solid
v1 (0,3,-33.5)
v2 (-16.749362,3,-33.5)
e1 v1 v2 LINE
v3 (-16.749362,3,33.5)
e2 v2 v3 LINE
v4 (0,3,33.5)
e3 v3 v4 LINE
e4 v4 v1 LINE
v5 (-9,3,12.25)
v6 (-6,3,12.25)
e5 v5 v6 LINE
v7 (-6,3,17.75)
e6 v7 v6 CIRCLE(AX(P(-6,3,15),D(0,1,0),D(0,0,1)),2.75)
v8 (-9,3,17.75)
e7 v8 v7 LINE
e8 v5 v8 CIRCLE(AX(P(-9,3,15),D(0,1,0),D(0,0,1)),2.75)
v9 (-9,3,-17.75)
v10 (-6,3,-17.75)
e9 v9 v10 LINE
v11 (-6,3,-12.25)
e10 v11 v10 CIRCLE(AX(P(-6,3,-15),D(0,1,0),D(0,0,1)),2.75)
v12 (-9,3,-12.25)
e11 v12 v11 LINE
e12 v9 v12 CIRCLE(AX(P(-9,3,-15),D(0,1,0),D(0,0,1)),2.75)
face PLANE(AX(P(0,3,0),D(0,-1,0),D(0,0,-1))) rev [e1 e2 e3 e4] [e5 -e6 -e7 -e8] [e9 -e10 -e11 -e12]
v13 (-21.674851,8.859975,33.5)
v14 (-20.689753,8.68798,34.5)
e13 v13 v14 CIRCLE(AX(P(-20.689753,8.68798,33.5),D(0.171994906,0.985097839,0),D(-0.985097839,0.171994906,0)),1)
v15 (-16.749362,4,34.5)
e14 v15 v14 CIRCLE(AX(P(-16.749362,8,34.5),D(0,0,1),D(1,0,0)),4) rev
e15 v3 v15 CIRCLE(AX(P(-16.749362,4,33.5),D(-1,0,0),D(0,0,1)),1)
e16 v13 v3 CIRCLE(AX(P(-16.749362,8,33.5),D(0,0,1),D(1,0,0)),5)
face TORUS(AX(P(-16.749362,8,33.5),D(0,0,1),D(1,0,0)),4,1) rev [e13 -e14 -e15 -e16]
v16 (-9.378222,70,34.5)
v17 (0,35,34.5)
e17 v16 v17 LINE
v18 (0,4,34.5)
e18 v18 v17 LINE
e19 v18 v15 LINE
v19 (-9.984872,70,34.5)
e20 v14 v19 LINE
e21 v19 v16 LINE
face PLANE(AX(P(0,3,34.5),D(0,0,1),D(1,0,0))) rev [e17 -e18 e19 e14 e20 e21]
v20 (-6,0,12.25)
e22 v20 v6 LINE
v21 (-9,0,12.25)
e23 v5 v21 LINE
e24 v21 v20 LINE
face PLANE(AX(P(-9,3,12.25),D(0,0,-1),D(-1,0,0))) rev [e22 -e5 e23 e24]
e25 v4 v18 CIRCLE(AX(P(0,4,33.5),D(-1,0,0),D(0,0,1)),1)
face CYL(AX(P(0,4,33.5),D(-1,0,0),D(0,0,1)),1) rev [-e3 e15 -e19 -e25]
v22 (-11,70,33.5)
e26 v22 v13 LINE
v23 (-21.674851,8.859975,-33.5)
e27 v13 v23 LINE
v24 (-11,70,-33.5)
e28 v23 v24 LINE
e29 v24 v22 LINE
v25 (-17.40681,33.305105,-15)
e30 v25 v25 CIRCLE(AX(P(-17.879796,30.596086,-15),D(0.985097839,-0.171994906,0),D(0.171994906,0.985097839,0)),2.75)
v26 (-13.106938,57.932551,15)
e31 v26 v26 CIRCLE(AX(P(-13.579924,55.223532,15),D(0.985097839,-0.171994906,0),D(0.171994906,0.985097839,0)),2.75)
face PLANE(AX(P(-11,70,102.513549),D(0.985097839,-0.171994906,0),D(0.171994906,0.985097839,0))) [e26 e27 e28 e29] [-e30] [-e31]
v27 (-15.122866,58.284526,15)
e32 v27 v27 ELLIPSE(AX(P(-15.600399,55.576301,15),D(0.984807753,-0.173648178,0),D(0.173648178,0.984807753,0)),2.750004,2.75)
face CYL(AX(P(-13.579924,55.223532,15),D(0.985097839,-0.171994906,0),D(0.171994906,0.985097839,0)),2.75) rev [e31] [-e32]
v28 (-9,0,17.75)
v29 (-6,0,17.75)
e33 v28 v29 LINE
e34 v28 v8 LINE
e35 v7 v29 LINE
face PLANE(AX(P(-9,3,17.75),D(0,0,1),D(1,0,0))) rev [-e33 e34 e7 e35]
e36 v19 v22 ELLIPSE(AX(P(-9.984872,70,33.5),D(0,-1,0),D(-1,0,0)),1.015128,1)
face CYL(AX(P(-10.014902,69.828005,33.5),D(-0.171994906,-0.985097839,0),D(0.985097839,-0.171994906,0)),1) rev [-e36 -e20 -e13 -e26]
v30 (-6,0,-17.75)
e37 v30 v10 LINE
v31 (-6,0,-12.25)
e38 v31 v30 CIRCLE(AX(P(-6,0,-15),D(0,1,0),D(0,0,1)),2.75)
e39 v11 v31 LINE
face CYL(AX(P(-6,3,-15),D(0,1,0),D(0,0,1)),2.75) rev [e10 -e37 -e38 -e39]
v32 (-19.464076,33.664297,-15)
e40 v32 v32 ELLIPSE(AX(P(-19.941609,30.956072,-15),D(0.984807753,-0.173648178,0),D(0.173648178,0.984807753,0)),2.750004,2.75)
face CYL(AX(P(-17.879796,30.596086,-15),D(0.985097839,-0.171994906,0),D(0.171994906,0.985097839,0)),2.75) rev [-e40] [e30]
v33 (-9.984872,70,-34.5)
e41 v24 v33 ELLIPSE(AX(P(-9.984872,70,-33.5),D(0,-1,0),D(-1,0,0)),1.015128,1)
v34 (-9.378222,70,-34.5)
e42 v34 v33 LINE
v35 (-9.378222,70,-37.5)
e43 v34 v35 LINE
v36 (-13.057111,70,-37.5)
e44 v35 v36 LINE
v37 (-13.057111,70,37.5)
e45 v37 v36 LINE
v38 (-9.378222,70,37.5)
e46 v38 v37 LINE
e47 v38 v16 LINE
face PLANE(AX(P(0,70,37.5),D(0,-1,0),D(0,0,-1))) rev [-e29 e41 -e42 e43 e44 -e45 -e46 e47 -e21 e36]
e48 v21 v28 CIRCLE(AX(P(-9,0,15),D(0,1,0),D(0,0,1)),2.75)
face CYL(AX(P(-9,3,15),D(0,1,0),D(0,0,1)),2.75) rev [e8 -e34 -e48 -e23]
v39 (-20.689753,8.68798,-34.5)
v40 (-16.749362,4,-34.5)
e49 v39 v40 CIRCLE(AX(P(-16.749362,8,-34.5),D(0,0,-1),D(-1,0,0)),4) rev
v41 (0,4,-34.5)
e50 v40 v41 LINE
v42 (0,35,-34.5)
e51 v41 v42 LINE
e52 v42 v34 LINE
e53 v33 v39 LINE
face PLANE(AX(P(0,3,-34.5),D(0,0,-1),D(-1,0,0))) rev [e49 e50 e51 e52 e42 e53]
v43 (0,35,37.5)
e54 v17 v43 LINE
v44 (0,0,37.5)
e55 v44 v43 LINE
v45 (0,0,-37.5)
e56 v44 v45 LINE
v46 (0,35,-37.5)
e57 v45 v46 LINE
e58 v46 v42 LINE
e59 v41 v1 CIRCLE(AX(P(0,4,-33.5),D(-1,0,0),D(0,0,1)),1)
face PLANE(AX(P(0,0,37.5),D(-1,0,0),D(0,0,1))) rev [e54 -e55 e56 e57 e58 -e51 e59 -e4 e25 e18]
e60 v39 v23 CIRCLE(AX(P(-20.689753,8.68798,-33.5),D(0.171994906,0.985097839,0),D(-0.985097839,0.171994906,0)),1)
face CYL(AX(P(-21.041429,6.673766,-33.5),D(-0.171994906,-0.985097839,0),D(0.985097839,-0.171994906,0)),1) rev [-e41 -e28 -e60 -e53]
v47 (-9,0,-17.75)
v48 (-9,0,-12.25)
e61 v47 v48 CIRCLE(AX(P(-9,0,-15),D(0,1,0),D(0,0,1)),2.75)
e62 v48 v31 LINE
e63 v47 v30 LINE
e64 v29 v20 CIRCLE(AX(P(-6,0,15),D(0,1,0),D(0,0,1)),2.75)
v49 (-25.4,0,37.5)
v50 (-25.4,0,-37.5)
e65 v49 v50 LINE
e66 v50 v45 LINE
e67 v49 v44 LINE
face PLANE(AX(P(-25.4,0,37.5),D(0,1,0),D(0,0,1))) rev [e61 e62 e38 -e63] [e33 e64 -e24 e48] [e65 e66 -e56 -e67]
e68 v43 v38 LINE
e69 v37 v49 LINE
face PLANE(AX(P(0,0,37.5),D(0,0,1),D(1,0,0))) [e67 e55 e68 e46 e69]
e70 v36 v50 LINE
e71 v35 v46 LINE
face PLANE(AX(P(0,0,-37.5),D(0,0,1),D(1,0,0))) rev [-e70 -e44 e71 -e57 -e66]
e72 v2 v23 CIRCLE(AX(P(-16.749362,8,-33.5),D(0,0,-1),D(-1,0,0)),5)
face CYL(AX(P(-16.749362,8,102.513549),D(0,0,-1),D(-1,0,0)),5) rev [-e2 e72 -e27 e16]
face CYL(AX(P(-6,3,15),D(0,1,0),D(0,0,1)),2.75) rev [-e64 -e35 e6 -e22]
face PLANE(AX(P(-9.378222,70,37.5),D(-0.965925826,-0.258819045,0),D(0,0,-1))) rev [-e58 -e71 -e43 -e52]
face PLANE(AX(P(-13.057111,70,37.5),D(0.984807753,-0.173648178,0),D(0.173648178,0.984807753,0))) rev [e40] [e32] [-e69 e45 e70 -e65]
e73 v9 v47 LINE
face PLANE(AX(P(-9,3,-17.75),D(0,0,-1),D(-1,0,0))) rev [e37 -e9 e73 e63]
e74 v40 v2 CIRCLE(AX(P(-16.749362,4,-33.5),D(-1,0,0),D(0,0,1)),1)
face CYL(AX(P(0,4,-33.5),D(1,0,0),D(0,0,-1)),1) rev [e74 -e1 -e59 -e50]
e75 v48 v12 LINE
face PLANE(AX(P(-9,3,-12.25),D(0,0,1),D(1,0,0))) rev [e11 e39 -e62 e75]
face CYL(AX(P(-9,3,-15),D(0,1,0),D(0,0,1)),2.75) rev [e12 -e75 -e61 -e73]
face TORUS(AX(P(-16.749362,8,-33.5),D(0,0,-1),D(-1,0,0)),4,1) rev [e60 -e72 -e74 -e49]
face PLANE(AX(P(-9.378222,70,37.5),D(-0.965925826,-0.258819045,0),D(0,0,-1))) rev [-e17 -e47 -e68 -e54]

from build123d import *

# Parameters (mm, degrees)
BOSS_EXTRUDE1_DEPTH            = 37.5
SKETCH2_W                      = 11
SKETCH2_H                      = 69
CUT_EXTRUDE1_DEPTH             = 67
CUT_EXTRUDE2_REACH             = 94.575
CUT_EXTRUDE2_DIRECTION_2_REACH = 94.575
M5_CLEARANCE_SLOT1_DEPTH       = 3
M5_CLEARANCE_HOLE1_D           = 5.5
CHAMFER1_SIZE                  = 35
CHAMFER1_SIZE2                 = 9.378221735
FILLET1_R                      = 5
FILLET2_R                      = 1


# Read off the part's stored shape, not the designer's step: M5 Clearance Slot1
with BuildPart() as part:
    # Sketch1 → Boss-Extrude1 (new, symmetric)
    with BuildSketch(Plane.XY):
        Polygon((-13.05711135, 70), (-25.4, 0), (0, 0), (0, 70), align=None)
    extrude(amount=BOSS_EXTRUDE1_DEPTH, both=True)

    # Sketch2 → Cut-Extrude1 (cut)
    with BuildSketch(Plane(origin=(0, 70, 0), x_dir=(1, 0, 0), z_dir=(0, 1, 0))):
        with Locations((-5.5, 0)):
            Rectangle(SKETCH2_W, SKETCH2_H)
    extrude(amount=-CUT_EXTRUDE1_DEPTH, mode=Mode.SUBTRACT)

    # Cut-Extrude2: up to this face of the body (flat: up to its plane)
    cut_extrude2_end = Plane(part.part.faces().sort_by_distance((-5.5, 36.5, 34.5))[0])
    # Sketch6 → Cut-Extrude2 (cut, up to the picked face)
    with BuildSketch(Plane.XY.offset(17.5), mode=Mode.PRIVATE) as cut_extrude2_sk1:
        Polygon((-11, 70), (-22.697983939, 3), (-11, 3), align=None)
    cut_extrude2_tool1 = split(extrude(cut_extrude2_sk1.sketch, amount=CUT_EXTRUDE2_REACH, mode=Mode.PRIVATE), bisect_by=cut_extrude2_end, keep=Keep.BOTH, mode=Mode.PRIVATE)
    add(cut_extrude2_tool1.solids().sort_by(Axis((-14.899328, 25.333333, 17.5), (0, 0, 1)))[0], mode=Mode.SUBTRACT)

    # Cut-Extrude2 direction 2: up to this face of the body (flat: up to its plane)
    cut_extrude2_direction_2_end = Plane(part.part.faces().sort_by_distance((-5.5, 36.5, -34.5))[0])
    # Sketch6 → Cut-Extrude2 direction 2 (cut, up to the picked face)
    with BuildSketch(Plane.XY.offset(17.5), mode=Mode.PRIVATE) as cut_extrude2_direction_2_sk1:
        Polygon((-11, 70), (-22.697983939, 3), (-11, 3), align=None)
    cut_extrude2_direction_2_tool1 = split(extrude(cut_extrude2_direction_2_sk1.sketch, amount=-CUT_EXTRUDE2_DIRECTION_2_REACH, mode=Mode.PRIVATE), bisect_by=cut_extrude2_direction_2_end, keep=Keep.BOTH, mode=Mode.PRIVATE)
    add(cut_extrude2_direction_2_tool1.solids().sort_by(Axis((-14.899328, 25.333333, 17.5), (0, 0, -1)))[0], mode=Mode.SUBTRACT)

    # M5 Clearance Slot1 outline → M5 Clearance Slot1 (cut)
    with BuildSketch(Plane(origin=(0, 0, 0), x_dir=(1, 0, 0), z_dir=(0, 1, 0))):
        with BuildLine():
            Line((-9, 12.25), (-6, 12.25))
            ThreePointArc((-6, 12.25), (-3.25, 15), (-6, 17.75))
            Line((-6, 17.75), (-9, 17.75))
            ThreePointArc((-9, 17.75), (-11.75, 15), (-9, 12.25))
        make_face()
        with BuildLine():
            Line((-9, -17.75), (-6, -17.75))
            ThreePointArc((-6, -17.75), (-3.25, -15), (-6, -12.25))
            Line((-6, -12.25), (-9, -12.25))
            ThreePointArc((-9, -12.25), (-11.75, -15), (-9, -17.75))
        make_face()
    extrude(amount=M5_CLEARANCE_SLOT1_DEPTH, mode=Mode.SUBTRACT)

    # M5 Clearance Hole1 (through all)
    with Locations(Plane(origin=(-22.534821987, 3.934507249, 0), x_dir=(0, 0, -1), z_dir=(0.985097838962238, -0.17199490594761452, 0))):
        with Locations((-15, 52.064904762), (15, 27.064904762)):
            Hole(M5_CLEARANCE_HOLE1_D / 2)

    # Chamfer1
    chamfer1_edges = [part.edges().sort_by_distance(p)[0] for p in [
        (0, 70, -36),
        (0, 70, 36),
    ]]
    chamfer1_side = [part.faces().sort_by_distance(p)[0] for p in [
        (0, 1.025914226, 0),
    ]]
    chamfer(chamfer1_edges, length=CHAMFER1_SIZE, length2=CHAMFER1_SIZE2, reference=chamfer1_side[0])

    # Fillet1
    fillet1_edges = [part.edges().sort_by_distance(p)[0] for p in [
        (-22.697983939, 3, 0),
    ]]
    fillet(fillet1_edges, radius=FILLET1_R)

    # Fillet2
    fillet2_edges = [part.edges().sort_by_distance(p)[0] for p in [
        (-8.374681044, 3, -34.5),
        (-16.337425642, 39.429987265, -34.5),
        (-16.337425642, 39.429987265, 34.5),
        (-20.576885612, 4.782848515, -34.5),
        (-8.374681044, 3, 34.5),
        (-20.576885612, 4.782848515, 34.5),
    ]]
    fillet(fillet2_edges, radius=FILLET2_R)


solid = part.part
